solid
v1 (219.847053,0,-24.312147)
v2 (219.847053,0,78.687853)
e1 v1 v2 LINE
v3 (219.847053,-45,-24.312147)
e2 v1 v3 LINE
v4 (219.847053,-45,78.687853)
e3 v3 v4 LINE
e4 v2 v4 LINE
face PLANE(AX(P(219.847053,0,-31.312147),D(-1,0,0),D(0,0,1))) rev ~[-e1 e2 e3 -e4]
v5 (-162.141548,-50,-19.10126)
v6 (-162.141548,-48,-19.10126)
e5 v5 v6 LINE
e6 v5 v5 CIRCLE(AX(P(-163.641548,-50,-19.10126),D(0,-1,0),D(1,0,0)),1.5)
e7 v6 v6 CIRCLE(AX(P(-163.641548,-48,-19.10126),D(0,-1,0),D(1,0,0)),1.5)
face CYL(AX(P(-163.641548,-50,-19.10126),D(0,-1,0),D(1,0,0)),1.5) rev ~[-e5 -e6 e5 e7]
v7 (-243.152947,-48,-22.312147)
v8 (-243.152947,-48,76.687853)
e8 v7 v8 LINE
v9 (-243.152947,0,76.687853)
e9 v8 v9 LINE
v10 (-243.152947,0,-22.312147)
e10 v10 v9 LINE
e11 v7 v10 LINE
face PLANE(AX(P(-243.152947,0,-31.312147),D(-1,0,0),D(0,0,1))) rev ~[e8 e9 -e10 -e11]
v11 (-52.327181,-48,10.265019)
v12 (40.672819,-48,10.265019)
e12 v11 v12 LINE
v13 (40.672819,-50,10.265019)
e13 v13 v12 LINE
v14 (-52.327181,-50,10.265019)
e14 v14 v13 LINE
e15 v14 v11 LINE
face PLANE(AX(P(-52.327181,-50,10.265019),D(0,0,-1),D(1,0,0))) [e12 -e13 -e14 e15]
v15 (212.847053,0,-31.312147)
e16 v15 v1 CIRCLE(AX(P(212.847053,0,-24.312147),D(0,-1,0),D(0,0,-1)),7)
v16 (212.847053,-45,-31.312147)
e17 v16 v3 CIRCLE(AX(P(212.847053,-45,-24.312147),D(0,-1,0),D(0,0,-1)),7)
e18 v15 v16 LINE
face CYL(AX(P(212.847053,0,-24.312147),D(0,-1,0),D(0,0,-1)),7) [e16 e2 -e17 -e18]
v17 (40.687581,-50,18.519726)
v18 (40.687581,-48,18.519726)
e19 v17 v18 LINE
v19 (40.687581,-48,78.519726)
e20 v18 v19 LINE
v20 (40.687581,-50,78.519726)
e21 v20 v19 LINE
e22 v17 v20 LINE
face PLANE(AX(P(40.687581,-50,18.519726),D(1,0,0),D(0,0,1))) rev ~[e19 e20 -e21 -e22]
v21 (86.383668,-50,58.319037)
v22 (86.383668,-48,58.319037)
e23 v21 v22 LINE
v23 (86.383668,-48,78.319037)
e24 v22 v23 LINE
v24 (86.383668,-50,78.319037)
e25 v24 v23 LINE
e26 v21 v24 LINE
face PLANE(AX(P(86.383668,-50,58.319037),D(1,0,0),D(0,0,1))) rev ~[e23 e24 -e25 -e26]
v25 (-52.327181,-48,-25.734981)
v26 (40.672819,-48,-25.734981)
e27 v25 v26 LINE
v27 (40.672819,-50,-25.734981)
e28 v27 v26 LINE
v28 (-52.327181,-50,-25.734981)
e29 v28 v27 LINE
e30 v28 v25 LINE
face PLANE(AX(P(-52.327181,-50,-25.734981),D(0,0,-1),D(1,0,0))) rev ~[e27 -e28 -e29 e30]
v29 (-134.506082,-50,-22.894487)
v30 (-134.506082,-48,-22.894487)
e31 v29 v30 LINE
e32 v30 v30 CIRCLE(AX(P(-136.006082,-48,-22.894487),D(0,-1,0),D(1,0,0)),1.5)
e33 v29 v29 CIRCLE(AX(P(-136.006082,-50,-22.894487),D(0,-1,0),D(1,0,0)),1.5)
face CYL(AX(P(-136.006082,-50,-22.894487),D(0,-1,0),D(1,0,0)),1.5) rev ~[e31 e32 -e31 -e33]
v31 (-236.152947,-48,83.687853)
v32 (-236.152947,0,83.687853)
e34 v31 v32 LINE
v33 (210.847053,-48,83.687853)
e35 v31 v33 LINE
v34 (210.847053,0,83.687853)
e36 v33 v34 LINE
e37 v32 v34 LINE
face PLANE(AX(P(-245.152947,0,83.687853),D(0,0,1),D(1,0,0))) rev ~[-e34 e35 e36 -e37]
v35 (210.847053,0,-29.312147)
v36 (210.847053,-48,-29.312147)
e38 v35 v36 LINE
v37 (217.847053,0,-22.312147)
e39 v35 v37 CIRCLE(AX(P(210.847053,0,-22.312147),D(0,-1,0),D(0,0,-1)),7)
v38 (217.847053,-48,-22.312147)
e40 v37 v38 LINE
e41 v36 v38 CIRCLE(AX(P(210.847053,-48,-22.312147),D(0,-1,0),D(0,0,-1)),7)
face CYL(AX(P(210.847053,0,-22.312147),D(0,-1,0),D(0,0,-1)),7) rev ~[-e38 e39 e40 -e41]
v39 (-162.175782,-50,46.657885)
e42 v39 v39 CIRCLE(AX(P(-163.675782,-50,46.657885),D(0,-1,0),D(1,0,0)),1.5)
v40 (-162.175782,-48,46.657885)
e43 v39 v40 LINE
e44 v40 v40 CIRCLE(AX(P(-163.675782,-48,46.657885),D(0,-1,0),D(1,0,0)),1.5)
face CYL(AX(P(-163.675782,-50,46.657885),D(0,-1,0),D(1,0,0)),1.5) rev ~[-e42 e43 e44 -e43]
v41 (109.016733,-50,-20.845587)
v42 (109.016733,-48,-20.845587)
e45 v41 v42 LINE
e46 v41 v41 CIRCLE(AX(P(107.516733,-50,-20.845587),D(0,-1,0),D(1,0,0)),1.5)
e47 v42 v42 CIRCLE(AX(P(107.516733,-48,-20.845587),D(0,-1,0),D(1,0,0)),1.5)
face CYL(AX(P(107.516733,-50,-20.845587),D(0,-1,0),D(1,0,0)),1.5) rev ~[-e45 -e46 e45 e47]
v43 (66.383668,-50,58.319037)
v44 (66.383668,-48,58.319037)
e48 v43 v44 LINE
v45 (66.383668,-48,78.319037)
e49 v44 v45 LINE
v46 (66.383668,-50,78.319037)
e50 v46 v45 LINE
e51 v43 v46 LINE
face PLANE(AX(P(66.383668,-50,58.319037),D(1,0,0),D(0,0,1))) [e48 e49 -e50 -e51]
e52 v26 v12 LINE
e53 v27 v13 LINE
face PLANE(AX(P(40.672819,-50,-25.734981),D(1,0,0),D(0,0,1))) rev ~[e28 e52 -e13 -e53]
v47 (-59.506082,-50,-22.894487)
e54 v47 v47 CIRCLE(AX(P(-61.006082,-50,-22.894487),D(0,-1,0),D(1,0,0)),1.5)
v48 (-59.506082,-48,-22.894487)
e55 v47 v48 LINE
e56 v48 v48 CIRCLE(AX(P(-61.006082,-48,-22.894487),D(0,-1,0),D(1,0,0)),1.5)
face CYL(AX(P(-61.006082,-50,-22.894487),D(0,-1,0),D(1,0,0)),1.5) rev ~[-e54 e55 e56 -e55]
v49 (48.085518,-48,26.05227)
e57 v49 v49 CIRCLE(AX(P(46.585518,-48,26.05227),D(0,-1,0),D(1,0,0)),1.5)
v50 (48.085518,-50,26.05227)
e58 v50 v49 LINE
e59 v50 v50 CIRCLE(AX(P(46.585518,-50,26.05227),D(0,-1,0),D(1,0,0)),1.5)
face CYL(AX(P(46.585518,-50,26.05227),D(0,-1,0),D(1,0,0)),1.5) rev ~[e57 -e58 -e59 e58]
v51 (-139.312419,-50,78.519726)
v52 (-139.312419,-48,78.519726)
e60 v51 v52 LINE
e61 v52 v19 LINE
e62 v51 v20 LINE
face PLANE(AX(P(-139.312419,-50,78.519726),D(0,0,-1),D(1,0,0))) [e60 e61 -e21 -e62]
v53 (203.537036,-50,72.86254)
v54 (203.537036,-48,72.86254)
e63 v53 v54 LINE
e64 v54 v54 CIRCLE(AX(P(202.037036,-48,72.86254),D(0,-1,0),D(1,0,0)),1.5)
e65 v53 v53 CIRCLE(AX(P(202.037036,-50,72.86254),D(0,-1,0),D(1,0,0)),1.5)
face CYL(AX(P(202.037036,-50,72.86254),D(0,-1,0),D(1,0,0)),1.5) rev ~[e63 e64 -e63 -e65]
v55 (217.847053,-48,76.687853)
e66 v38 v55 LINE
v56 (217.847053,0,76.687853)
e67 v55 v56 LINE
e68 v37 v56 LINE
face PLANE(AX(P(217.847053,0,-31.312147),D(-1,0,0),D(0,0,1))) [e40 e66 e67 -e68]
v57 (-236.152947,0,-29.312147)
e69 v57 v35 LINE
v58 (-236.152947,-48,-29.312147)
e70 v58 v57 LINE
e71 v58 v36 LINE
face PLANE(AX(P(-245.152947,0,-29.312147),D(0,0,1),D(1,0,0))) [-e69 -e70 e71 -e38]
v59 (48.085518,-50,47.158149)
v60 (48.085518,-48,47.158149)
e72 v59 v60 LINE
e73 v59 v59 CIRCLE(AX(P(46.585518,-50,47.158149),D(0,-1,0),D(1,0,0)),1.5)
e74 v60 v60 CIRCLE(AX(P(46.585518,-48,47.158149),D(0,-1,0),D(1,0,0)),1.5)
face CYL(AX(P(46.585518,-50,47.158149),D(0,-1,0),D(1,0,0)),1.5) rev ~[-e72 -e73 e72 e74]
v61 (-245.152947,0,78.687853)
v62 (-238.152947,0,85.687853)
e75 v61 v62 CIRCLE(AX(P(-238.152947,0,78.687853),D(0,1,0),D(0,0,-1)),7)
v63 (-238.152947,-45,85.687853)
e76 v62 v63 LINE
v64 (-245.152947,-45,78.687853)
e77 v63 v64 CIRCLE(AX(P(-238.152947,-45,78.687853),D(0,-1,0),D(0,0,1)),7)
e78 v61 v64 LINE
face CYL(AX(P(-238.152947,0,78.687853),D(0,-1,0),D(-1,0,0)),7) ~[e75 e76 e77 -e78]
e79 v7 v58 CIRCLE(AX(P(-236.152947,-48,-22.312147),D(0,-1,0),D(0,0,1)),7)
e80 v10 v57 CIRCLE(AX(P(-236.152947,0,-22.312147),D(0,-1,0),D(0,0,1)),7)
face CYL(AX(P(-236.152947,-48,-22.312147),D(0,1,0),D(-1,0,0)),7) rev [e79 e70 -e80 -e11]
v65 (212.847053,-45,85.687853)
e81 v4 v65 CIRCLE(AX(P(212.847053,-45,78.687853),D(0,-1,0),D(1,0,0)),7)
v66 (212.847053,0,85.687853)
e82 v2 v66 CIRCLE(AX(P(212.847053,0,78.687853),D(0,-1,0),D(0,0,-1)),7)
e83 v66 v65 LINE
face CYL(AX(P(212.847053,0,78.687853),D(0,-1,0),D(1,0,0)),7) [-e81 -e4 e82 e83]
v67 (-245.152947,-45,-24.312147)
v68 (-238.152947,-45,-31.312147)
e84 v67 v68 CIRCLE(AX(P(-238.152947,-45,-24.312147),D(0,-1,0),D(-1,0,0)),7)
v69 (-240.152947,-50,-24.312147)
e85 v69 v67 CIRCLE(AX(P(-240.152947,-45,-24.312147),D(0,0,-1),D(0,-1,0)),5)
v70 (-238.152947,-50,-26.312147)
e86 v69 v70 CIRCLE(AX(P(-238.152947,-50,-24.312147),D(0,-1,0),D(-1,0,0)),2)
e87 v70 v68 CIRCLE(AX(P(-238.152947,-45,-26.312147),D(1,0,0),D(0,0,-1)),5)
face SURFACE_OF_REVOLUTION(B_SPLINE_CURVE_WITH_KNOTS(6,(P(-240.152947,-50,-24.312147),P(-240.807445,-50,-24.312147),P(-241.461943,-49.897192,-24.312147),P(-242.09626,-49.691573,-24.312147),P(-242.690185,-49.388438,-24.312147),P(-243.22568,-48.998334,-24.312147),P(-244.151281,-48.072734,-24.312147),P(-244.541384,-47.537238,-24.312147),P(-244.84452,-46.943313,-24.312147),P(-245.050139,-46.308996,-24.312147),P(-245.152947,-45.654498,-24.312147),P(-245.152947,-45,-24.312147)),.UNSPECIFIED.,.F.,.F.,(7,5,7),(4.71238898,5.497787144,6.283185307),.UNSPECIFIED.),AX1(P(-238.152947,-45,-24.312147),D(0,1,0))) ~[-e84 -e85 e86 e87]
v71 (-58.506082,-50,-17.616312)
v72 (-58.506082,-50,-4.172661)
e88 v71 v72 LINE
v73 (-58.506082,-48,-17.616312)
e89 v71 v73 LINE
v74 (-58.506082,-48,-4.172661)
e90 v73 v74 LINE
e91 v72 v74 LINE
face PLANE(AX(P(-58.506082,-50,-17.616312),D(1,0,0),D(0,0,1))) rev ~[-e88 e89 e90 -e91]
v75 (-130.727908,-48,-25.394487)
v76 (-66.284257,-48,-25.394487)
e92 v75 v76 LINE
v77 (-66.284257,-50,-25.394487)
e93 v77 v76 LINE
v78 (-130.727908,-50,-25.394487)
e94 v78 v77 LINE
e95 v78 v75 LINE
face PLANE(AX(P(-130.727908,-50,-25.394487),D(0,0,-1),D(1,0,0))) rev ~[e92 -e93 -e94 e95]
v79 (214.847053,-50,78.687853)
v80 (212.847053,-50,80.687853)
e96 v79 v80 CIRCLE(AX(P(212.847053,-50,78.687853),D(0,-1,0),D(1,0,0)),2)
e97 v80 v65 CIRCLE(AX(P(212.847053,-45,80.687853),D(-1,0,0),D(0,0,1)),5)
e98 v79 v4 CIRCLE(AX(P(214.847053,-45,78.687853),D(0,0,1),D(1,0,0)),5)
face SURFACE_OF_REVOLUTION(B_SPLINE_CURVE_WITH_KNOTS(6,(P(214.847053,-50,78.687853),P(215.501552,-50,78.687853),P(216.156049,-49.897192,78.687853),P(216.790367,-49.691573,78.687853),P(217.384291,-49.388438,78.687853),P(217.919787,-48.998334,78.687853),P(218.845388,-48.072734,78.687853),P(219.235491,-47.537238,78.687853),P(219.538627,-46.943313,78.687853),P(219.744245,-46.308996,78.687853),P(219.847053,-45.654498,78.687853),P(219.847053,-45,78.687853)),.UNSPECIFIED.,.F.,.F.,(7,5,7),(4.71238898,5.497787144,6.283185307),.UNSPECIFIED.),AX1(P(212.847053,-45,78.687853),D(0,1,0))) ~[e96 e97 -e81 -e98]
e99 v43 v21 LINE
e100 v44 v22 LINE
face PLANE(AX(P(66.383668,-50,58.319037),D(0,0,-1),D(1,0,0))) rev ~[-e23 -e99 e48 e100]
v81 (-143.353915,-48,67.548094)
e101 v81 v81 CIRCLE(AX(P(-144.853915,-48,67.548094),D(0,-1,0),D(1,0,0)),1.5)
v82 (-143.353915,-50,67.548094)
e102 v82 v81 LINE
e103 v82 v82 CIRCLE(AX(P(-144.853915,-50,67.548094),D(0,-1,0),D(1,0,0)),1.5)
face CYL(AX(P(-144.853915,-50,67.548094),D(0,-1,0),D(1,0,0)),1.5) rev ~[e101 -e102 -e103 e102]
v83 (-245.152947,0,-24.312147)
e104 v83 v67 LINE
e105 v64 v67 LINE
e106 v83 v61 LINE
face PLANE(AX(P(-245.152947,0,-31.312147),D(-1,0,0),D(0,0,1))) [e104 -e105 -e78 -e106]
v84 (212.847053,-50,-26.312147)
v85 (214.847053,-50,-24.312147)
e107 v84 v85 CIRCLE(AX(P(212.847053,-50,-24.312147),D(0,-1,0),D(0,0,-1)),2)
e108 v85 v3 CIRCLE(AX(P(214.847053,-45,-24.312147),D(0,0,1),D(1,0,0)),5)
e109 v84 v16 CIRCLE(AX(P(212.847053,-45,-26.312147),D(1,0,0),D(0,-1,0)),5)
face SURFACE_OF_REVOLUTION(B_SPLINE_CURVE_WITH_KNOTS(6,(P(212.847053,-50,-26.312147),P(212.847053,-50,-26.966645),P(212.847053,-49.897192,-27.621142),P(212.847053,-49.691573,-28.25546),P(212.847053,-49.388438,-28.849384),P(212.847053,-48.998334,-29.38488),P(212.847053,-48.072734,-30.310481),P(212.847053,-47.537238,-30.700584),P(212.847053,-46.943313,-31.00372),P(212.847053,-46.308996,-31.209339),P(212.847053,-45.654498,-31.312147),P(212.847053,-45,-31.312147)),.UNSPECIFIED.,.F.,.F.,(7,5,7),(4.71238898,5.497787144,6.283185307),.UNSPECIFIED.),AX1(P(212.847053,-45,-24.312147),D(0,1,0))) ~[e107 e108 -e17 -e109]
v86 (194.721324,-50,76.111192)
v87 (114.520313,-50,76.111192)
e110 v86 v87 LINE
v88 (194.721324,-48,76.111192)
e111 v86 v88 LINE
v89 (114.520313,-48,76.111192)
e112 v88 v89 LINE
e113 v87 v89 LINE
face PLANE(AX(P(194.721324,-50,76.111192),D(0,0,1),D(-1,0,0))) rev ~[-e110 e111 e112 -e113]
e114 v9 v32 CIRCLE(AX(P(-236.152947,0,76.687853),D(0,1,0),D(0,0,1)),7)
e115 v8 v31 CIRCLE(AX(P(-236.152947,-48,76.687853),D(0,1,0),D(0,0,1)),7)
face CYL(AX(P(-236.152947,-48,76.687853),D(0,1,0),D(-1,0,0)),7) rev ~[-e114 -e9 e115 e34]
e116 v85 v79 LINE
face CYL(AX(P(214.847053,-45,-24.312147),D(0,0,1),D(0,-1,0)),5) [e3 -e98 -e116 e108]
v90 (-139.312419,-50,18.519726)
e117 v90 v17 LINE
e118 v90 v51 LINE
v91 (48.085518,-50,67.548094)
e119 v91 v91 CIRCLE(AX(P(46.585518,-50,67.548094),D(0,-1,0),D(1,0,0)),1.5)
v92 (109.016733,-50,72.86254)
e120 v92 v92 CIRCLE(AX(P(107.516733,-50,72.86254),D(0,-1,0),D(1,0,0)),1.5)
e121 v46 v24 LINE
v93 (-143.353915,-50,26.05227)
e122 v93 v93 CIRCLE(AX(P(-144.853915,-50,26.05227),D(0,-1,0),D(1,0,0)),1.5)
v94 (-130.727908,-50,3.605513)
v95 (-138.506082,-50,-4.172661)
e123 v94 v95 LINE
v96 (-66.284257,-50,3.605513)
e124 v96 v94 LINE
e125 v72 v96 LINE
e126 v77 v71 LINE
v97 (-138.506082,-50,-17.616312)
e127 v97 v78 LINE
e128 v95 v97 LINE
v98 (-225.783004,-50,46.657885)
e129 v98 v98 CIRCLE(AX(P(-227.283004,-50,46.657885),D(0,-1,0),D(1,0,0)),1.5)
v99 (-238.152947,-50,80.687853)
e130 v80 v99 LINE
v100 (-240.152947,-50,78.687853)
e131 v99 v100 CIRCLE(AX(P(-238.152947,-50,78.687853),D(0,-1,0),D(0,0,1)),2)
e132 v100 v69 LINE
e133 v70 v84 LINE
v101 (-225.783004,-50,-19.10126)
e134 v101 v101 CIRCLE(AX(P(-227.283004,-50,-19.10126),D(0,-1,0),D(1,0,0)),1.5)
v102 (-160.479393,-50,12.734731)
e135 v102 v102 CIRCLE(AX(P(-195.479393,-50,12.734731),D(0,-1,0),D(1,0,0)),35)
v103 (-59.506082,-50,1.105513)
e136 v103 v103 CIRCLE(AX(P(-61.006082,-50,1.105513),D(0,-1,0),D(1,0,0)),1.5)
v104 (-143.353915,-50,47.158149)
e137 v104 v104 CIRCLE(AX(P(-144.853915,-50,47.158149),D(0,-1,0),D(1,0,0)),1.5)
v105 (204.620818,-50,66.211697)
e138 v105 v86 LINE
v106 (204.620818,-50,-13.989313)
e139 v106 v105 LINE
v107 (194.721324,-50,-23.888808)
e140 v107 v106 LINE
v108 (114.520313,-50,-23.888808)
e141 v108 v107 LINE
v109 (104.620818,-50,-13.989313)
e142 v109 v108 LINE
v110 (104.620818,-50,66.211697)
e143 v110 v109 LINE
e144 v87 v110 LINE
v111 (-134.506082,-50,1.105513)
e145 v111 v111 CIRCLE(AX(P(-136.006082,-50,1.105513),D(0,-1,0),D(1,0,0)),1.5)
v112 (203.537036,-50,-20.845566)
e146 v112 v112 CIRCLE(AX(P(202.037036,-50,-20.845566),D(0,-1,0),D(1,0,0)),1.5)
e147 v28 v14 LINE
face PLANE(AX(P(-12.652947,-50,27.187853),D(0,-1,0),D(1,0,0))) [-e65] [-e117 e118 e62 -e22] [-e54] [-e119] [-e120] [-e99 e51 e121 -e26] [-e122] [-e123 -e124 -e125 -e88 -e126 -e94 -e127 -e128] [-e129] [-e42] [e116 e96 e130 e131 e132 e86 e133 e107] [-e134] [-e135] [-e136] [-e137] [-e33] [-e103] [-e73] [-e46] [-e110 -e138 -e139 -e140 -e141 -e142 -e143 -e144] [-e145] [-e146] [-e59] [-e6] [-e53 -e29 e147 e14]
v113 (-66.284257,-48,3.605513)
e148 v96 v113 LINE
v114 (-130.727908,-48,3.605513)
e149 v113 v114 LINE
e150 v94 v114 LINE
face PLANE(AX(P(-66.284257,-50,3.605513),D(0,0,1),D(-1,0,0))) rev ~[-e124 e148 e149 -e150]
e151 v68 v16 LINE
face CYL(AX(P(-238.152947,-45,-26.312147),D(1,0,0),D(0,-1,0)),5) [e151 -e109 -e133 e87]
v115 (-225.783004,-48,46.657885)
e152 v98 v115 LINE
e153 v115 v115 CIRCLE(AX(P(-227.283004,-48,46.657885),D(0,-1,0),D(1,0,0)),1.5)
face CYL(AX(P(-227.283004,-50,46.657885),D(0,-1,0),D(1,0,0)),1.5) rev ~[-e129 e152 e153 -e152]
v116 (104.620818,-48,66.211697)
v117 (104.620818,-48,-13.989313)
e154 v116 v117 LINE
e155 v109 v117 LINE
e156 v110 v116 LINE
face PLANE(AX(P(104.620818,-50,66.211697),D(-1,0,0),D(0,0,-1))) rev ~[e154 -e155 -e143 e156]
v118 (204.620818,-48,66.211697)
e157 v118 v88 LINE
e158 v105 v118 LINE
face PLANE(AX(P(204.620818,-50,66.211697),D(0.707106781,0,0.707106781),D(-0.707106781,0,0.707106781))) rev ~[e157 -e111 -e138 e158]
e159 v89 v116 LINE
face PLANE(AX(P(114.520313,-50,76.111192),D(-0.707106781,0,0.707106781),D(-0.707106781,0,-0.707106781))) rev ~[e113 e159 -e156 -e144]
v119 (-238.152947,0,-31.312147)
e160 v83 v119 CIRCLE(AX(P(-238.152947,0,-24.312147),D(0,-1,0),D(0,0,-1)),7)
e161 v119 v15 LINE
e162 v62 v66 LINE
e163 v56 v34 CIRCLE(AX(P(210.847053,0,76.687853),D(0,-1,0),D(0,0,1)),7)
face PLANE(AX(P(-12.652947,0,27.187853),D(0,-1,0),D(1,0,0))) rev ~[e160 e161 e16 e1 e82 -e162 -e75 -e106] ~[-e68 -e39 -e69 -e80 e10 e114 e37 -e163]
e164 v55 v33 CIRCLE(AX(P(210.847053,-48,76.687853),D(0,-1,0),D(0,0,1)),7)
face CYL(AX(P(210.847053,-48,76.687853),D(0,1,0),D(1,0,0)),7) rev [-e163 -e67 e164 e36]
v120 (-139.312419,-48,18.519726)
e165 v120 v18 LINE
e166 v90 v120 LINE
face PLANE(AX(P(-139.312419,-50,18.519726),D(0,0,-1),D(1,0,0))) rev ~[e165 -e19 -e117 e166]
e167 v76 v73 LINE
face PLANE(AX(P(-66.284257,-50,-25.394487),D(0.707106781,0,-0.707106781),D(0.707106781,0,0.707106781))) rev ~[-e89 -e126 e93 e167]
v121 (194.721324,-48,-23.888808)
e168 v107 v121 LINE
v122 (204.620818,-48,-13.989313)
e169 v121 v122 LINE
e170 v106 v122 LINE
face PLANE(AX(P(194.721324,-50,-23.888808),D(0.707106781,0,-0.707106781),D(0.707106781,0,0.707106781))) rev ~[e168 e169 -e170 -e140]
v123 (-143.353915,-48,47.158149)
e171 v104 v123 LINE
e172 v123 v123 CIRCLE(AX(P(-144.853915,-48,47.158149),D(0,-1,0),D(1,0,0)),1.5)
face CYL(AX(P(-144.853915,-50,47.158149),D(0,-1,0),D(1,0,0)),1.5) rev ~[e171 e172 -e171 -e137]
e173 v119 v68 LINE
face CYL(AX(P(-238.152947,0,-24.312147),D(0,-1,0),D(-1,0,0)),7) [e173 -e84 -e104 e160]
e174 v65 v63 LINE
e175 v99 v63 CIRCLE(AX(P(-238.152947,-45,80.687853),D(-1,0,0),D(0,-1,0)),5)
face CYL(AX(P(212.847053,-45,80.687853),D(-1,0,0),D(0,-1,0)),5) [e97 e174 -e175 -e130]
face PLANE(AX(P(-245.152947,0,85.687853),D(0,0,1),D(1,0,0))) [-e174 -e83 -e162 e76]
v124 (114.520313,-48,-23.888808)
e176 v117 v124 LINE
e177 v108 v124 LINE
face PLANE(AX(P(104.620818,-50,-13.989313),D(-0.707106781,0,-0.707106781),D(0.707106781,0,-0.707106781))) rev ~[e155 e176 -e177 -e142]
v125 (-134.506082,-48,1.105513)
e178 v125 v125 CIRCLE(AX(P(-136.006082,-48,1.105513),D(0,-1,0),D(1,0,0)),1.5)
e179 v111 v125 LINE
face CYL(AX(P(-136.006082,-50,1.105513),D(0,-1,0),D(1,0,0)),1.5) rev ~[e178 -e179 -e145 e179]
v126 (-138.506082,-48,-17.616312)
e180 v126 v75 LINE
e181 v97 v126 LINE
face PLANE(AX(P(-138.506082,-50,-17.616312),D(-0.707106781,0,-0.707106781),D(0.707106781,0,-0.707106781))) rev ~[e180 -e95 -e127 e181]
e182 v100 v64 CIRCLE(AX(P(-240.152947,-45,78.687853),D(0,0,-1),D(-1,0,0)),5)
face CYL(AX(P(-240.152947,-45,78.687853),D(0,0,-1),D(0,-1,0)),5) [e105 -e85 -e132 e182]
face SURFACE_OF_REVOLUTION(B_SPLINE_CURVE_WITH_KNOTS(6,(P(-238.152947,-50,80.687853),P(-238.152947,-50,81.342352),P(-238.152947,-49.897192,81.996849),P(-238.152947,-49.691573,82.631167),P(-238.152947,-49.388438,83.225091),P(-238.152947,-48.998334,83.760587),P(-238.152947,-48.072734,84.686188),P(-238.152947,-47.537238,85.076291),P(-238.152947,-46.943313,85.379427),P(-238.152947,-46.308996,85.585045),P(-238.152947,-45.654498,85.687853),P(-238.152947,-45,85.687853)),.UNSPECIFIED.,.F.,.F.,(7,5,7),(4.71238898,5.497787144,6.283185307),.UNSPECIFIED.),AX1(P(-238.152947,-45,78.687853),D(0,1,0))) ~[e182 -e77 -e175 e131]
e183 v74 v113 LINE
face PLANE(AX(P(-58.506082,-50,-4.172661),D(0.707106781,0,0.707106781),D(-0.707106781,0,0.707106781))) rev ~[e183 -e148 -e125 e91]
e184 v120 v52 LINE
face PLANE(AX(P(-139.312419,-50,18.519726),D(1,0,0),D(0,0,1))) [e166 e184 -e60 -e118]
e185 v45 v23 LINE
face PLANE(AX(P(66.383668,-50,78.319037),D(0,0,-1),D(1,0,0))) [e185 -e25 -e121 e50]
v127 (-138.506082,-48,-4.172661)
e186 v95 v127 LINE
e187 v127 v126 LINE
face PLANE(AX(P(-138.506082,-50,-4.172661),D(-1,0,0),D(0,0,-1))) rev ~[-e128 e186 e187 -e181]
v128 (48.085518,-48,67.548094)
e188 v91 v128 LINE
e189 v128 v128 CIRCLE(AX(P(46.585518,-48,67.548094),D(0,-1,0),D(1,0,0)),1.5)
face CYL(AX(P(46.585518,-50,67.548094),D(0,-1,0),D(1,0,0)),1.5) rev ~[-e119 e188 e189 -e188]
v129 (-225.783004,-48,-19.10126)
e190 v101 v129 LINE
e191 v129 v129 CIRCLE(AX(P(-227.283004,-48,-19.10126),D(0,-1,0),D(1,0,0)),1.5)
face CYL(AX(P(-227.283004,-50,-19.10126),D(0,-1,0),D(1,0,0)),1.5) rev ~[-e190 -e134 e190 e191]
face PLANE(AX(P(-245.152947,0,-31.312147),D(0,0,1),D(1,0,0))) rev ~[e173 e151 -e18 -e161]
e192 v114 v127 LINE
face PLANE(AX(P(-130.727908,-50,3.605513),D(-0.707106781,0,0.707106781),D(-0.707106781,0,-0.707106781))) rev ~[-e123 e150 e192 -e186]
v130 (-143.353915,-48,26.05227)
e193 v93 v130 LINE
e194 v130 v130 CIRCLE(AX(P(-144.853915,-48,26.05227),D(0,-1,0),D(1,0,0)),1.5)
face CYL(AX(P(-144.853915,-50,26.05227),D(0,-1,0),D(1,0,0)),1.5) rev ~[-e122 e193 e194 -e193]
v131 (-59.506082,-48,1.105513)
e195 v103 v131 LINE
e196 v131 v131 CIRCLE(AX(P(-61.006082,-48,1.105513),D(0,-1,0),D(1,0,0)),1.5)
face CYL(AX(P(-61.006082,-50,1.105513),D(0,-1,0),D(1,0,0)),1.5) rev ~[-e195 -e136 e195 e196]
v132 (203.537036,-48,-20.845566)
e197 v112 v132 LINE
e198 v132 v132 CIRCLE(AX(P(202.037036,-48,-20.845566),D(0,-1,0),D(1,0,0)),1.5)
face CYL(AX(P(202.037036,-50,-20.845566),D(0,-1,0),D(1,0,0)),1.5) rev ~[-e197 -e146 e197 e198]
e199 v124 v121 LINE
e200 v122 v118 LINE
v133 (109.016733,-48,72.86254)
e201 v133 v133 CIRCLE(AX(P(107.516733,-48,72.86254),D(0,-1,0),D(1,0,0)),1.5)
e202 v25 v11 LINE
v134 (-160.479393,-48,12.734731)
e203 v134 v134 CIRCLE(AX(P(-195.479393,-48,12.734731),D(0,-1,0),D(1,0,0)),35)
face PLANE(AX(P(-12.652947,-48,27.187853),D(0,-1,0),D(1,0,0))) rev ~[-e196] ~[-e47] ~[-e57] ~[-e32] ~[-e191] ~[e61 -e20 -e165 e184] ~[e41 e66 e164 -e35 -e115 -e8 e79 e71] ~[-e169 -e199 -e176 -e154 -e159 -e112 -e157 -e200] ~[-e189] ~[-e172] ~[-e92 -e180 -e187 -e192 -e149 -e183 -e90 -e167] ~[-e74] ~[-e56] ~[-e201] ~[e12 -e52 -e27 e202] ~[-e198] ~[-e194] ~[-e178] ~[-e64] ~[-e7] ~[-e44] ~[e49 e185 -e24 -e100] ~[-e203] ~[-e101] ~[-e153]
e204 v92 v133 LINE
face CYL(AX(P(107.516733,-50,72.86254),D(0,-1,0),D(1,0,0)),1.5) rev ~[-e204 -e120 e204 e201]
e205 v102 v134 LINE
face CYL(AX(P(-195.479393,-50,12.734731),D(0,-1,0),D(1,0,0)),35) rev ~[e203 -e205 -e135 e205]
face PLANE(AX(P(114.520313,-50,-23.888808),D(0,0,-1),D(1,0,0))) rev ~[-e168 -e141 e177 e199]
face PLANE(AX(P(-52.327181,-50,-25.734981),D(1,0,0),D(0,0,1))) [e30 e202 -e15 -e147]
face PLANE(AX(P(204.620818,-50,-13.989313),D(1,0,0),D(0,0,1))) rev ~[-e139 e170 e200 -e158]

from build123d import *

# Parameters (mm, degrees)
F0_W     = 465
F0_H     = 117
F1_DEPTH = 50
F2_T     = -2
F4_R     = 7
F3_W     = 180
F3_H     = 60
F3_W_2   = 20
F3_H_2   = 20
F3_W_3   = 93
F3_H_3   = 36
F3_R     = 1.5
F3_W_4   = 77
F3_H_4   = 77
F3_R_2   = 9.5
F3_R_3   = 35
F5_DEPTH = 25
F6_R     = 5


with BuildPart() as f1:
    # F0 (on Front) → F1 (new body)
    with BuildSketch(Plane.XZ):
        with Locations((-12.6529467106, 27.1878533959)):
            Rectangle(F0_W, F0_H)
    extrude(amount=F1_DEPTH)

    # F2
    f2_openings = [f1.faces().sort_by_distance(p)[0] for p in [
        (-12.652947, 0, 27.187853),
    ]]
    offset(amount=F2_T, openings=f2_openings)

    # F4
    f4_edges = [f1.edges().sort_by_distance(p)[0] for p in [
        (-245.152947, -25, 85.687853),
        (219.847053, -25, 85.687853),
        (219.847053, -25, -31.312147),
        (-245.152947, -25, -31.312147),
        (-243.152947, -24, 83.687853),
        (-243.152947, -24, -29.312147),
        (217.847053, -24, -29.312147),
        (217.847053, -24, 83.687853),
    ]]
    fillet(f4_edges, radius=F4_R)

    # F3 (on face) → F5 (cut)
    with BuildSketch(Plane.XZ.offset(50)):
        with Locations((-49.312419115, 48.5197262004)):
            Rectangle(F3_W, F3_H)
        with Locations((76.3836680665, 68.3190373614)):
            Rectangle(F3_W_2, F3_H_2)
        Polygon((194.7213235501, 76.111191912), (114.5203134233, 76.111191912), (104.6208184867, 66.2116969754), (104.6208184867, -13.9893131514), (114.5203134233, -23.888808088), (194.7213235501, -23.888808088), (204.6208184867, -13.9893131514), (204.6208184867, 66.2116969754), align=None)
        with Locations((-81.5471372292, -73.4631650165)):
            Rectangle(F3_W_3, F3_H_3)
        with Locations((46.5855184052, 67.5480939005)):
            Circle(F3_R)
        with Locations((46.5855184052, 47.158148972)):
            Circle(F3_R)
        with Locations((46.5855184052, 26.052269754)):
            Circle(F3_R)
        with Locations((-195.3124095783, -98.1716645822)):
            Rectangle(F3_W_4, F3_H_4)
        with Locations((107.5167332374, 72.8625404379)):
            Circle(F3_R)
        with Locations((80.878779198, -82.3583360478)):
            Rectangle(F3_W_3, F3_H_3)
        with Locations((51.3206828289, -84.0745766136)):
            Circle(F3_R_2, mode=Mode.SUBTRACT)
        with Locations((81.3476530956, -84.0745766136)):
            Circle(F3_R_2, mode=Mode.SUBTRACT)
        with Locations((123.378779198, -96.3583360478)):
            Circle(F3_R, mode=Mode.SUBTRACT)
        with Locations((110.7360261029, -84.0745766136)):
            Circle(F3_R_2, mode=Mode.SUBTRACT)
        with Locations((38.378779198, -68.3583360478)):
            Circle(F3_R, mode=Mode.SUBTRACT)
        Polygon((-66.2842570873, 3.6055132091), (-130.7279079012, 3.6055132091), (-138.5060824942, -4.172661384), (-138.5060824942, -17.6163121979), (-130.7279079012, -25.3944867909), (-66.2842570873, -25.3944867909), (-58.5060824942, -17.6163121979), (-58.5060824942, -4.172661384), align=None)
        with Locations((-136.0060824942, 1.1055132091)):
            Circle(F3_R)
        with Locations((-136.0060824942, -22.8944867909)):
            Circle(F3_R)
        with Locations((-61.0060824942, 1.1055132091)):
            Circle(F3_R)
        with Locations((-61.0060824942, -22.8944867909)):
            Circle(F3_R)
        with Locations((107.5167332374, -20.8455865502)):
            Circle(F3_R)
        with Locations((202.0370356229, -20.8455660029)):
            Circle(F3_R)
        with Locations((202.0370356229, 72.8625404379)):
            Circle(F3_R)
        with Locations((-195.4793932134, 12.7347313118)):
            Circle(F3_R_3)
        with Locations((-144.8539147958, 67.5480939005)):
            Circle(F3_R)
        with Locations((-144.8539147958, 47.158148972)):
            Circle(F3_R)
        with Locations((-144.8539147958, 26.052269754)):
            Circle(F3_R)
        with Locations((-227.2830040105, 46.6578847659)):
            Circle(F3_R)
        with Locations((-227.2830040105, -19.1012599602)):
            Circle(F3_R)
        with Locations((-163.6415483004, -19.1012599602)):
            Circle(F3_R)
        with Locations((-5.8271809206, -7.7349814937)):
            Rectangle(F3_W_3, F3_H_3)
        with Locations((-163.6757824164, 46.6578847659)):
            Circle(F3_R)
    extrude(amount=-F5_DEPTH, mode=Mode.SUBTRACT)

    # F6
    f6_edges = [f1.edges().sort_by_distance(p)[0] for p in [
        (217.796801, -50, 83.637601),
    ]]
    fillet(f6_edges, radius=F6_R)


solid = f1.part
